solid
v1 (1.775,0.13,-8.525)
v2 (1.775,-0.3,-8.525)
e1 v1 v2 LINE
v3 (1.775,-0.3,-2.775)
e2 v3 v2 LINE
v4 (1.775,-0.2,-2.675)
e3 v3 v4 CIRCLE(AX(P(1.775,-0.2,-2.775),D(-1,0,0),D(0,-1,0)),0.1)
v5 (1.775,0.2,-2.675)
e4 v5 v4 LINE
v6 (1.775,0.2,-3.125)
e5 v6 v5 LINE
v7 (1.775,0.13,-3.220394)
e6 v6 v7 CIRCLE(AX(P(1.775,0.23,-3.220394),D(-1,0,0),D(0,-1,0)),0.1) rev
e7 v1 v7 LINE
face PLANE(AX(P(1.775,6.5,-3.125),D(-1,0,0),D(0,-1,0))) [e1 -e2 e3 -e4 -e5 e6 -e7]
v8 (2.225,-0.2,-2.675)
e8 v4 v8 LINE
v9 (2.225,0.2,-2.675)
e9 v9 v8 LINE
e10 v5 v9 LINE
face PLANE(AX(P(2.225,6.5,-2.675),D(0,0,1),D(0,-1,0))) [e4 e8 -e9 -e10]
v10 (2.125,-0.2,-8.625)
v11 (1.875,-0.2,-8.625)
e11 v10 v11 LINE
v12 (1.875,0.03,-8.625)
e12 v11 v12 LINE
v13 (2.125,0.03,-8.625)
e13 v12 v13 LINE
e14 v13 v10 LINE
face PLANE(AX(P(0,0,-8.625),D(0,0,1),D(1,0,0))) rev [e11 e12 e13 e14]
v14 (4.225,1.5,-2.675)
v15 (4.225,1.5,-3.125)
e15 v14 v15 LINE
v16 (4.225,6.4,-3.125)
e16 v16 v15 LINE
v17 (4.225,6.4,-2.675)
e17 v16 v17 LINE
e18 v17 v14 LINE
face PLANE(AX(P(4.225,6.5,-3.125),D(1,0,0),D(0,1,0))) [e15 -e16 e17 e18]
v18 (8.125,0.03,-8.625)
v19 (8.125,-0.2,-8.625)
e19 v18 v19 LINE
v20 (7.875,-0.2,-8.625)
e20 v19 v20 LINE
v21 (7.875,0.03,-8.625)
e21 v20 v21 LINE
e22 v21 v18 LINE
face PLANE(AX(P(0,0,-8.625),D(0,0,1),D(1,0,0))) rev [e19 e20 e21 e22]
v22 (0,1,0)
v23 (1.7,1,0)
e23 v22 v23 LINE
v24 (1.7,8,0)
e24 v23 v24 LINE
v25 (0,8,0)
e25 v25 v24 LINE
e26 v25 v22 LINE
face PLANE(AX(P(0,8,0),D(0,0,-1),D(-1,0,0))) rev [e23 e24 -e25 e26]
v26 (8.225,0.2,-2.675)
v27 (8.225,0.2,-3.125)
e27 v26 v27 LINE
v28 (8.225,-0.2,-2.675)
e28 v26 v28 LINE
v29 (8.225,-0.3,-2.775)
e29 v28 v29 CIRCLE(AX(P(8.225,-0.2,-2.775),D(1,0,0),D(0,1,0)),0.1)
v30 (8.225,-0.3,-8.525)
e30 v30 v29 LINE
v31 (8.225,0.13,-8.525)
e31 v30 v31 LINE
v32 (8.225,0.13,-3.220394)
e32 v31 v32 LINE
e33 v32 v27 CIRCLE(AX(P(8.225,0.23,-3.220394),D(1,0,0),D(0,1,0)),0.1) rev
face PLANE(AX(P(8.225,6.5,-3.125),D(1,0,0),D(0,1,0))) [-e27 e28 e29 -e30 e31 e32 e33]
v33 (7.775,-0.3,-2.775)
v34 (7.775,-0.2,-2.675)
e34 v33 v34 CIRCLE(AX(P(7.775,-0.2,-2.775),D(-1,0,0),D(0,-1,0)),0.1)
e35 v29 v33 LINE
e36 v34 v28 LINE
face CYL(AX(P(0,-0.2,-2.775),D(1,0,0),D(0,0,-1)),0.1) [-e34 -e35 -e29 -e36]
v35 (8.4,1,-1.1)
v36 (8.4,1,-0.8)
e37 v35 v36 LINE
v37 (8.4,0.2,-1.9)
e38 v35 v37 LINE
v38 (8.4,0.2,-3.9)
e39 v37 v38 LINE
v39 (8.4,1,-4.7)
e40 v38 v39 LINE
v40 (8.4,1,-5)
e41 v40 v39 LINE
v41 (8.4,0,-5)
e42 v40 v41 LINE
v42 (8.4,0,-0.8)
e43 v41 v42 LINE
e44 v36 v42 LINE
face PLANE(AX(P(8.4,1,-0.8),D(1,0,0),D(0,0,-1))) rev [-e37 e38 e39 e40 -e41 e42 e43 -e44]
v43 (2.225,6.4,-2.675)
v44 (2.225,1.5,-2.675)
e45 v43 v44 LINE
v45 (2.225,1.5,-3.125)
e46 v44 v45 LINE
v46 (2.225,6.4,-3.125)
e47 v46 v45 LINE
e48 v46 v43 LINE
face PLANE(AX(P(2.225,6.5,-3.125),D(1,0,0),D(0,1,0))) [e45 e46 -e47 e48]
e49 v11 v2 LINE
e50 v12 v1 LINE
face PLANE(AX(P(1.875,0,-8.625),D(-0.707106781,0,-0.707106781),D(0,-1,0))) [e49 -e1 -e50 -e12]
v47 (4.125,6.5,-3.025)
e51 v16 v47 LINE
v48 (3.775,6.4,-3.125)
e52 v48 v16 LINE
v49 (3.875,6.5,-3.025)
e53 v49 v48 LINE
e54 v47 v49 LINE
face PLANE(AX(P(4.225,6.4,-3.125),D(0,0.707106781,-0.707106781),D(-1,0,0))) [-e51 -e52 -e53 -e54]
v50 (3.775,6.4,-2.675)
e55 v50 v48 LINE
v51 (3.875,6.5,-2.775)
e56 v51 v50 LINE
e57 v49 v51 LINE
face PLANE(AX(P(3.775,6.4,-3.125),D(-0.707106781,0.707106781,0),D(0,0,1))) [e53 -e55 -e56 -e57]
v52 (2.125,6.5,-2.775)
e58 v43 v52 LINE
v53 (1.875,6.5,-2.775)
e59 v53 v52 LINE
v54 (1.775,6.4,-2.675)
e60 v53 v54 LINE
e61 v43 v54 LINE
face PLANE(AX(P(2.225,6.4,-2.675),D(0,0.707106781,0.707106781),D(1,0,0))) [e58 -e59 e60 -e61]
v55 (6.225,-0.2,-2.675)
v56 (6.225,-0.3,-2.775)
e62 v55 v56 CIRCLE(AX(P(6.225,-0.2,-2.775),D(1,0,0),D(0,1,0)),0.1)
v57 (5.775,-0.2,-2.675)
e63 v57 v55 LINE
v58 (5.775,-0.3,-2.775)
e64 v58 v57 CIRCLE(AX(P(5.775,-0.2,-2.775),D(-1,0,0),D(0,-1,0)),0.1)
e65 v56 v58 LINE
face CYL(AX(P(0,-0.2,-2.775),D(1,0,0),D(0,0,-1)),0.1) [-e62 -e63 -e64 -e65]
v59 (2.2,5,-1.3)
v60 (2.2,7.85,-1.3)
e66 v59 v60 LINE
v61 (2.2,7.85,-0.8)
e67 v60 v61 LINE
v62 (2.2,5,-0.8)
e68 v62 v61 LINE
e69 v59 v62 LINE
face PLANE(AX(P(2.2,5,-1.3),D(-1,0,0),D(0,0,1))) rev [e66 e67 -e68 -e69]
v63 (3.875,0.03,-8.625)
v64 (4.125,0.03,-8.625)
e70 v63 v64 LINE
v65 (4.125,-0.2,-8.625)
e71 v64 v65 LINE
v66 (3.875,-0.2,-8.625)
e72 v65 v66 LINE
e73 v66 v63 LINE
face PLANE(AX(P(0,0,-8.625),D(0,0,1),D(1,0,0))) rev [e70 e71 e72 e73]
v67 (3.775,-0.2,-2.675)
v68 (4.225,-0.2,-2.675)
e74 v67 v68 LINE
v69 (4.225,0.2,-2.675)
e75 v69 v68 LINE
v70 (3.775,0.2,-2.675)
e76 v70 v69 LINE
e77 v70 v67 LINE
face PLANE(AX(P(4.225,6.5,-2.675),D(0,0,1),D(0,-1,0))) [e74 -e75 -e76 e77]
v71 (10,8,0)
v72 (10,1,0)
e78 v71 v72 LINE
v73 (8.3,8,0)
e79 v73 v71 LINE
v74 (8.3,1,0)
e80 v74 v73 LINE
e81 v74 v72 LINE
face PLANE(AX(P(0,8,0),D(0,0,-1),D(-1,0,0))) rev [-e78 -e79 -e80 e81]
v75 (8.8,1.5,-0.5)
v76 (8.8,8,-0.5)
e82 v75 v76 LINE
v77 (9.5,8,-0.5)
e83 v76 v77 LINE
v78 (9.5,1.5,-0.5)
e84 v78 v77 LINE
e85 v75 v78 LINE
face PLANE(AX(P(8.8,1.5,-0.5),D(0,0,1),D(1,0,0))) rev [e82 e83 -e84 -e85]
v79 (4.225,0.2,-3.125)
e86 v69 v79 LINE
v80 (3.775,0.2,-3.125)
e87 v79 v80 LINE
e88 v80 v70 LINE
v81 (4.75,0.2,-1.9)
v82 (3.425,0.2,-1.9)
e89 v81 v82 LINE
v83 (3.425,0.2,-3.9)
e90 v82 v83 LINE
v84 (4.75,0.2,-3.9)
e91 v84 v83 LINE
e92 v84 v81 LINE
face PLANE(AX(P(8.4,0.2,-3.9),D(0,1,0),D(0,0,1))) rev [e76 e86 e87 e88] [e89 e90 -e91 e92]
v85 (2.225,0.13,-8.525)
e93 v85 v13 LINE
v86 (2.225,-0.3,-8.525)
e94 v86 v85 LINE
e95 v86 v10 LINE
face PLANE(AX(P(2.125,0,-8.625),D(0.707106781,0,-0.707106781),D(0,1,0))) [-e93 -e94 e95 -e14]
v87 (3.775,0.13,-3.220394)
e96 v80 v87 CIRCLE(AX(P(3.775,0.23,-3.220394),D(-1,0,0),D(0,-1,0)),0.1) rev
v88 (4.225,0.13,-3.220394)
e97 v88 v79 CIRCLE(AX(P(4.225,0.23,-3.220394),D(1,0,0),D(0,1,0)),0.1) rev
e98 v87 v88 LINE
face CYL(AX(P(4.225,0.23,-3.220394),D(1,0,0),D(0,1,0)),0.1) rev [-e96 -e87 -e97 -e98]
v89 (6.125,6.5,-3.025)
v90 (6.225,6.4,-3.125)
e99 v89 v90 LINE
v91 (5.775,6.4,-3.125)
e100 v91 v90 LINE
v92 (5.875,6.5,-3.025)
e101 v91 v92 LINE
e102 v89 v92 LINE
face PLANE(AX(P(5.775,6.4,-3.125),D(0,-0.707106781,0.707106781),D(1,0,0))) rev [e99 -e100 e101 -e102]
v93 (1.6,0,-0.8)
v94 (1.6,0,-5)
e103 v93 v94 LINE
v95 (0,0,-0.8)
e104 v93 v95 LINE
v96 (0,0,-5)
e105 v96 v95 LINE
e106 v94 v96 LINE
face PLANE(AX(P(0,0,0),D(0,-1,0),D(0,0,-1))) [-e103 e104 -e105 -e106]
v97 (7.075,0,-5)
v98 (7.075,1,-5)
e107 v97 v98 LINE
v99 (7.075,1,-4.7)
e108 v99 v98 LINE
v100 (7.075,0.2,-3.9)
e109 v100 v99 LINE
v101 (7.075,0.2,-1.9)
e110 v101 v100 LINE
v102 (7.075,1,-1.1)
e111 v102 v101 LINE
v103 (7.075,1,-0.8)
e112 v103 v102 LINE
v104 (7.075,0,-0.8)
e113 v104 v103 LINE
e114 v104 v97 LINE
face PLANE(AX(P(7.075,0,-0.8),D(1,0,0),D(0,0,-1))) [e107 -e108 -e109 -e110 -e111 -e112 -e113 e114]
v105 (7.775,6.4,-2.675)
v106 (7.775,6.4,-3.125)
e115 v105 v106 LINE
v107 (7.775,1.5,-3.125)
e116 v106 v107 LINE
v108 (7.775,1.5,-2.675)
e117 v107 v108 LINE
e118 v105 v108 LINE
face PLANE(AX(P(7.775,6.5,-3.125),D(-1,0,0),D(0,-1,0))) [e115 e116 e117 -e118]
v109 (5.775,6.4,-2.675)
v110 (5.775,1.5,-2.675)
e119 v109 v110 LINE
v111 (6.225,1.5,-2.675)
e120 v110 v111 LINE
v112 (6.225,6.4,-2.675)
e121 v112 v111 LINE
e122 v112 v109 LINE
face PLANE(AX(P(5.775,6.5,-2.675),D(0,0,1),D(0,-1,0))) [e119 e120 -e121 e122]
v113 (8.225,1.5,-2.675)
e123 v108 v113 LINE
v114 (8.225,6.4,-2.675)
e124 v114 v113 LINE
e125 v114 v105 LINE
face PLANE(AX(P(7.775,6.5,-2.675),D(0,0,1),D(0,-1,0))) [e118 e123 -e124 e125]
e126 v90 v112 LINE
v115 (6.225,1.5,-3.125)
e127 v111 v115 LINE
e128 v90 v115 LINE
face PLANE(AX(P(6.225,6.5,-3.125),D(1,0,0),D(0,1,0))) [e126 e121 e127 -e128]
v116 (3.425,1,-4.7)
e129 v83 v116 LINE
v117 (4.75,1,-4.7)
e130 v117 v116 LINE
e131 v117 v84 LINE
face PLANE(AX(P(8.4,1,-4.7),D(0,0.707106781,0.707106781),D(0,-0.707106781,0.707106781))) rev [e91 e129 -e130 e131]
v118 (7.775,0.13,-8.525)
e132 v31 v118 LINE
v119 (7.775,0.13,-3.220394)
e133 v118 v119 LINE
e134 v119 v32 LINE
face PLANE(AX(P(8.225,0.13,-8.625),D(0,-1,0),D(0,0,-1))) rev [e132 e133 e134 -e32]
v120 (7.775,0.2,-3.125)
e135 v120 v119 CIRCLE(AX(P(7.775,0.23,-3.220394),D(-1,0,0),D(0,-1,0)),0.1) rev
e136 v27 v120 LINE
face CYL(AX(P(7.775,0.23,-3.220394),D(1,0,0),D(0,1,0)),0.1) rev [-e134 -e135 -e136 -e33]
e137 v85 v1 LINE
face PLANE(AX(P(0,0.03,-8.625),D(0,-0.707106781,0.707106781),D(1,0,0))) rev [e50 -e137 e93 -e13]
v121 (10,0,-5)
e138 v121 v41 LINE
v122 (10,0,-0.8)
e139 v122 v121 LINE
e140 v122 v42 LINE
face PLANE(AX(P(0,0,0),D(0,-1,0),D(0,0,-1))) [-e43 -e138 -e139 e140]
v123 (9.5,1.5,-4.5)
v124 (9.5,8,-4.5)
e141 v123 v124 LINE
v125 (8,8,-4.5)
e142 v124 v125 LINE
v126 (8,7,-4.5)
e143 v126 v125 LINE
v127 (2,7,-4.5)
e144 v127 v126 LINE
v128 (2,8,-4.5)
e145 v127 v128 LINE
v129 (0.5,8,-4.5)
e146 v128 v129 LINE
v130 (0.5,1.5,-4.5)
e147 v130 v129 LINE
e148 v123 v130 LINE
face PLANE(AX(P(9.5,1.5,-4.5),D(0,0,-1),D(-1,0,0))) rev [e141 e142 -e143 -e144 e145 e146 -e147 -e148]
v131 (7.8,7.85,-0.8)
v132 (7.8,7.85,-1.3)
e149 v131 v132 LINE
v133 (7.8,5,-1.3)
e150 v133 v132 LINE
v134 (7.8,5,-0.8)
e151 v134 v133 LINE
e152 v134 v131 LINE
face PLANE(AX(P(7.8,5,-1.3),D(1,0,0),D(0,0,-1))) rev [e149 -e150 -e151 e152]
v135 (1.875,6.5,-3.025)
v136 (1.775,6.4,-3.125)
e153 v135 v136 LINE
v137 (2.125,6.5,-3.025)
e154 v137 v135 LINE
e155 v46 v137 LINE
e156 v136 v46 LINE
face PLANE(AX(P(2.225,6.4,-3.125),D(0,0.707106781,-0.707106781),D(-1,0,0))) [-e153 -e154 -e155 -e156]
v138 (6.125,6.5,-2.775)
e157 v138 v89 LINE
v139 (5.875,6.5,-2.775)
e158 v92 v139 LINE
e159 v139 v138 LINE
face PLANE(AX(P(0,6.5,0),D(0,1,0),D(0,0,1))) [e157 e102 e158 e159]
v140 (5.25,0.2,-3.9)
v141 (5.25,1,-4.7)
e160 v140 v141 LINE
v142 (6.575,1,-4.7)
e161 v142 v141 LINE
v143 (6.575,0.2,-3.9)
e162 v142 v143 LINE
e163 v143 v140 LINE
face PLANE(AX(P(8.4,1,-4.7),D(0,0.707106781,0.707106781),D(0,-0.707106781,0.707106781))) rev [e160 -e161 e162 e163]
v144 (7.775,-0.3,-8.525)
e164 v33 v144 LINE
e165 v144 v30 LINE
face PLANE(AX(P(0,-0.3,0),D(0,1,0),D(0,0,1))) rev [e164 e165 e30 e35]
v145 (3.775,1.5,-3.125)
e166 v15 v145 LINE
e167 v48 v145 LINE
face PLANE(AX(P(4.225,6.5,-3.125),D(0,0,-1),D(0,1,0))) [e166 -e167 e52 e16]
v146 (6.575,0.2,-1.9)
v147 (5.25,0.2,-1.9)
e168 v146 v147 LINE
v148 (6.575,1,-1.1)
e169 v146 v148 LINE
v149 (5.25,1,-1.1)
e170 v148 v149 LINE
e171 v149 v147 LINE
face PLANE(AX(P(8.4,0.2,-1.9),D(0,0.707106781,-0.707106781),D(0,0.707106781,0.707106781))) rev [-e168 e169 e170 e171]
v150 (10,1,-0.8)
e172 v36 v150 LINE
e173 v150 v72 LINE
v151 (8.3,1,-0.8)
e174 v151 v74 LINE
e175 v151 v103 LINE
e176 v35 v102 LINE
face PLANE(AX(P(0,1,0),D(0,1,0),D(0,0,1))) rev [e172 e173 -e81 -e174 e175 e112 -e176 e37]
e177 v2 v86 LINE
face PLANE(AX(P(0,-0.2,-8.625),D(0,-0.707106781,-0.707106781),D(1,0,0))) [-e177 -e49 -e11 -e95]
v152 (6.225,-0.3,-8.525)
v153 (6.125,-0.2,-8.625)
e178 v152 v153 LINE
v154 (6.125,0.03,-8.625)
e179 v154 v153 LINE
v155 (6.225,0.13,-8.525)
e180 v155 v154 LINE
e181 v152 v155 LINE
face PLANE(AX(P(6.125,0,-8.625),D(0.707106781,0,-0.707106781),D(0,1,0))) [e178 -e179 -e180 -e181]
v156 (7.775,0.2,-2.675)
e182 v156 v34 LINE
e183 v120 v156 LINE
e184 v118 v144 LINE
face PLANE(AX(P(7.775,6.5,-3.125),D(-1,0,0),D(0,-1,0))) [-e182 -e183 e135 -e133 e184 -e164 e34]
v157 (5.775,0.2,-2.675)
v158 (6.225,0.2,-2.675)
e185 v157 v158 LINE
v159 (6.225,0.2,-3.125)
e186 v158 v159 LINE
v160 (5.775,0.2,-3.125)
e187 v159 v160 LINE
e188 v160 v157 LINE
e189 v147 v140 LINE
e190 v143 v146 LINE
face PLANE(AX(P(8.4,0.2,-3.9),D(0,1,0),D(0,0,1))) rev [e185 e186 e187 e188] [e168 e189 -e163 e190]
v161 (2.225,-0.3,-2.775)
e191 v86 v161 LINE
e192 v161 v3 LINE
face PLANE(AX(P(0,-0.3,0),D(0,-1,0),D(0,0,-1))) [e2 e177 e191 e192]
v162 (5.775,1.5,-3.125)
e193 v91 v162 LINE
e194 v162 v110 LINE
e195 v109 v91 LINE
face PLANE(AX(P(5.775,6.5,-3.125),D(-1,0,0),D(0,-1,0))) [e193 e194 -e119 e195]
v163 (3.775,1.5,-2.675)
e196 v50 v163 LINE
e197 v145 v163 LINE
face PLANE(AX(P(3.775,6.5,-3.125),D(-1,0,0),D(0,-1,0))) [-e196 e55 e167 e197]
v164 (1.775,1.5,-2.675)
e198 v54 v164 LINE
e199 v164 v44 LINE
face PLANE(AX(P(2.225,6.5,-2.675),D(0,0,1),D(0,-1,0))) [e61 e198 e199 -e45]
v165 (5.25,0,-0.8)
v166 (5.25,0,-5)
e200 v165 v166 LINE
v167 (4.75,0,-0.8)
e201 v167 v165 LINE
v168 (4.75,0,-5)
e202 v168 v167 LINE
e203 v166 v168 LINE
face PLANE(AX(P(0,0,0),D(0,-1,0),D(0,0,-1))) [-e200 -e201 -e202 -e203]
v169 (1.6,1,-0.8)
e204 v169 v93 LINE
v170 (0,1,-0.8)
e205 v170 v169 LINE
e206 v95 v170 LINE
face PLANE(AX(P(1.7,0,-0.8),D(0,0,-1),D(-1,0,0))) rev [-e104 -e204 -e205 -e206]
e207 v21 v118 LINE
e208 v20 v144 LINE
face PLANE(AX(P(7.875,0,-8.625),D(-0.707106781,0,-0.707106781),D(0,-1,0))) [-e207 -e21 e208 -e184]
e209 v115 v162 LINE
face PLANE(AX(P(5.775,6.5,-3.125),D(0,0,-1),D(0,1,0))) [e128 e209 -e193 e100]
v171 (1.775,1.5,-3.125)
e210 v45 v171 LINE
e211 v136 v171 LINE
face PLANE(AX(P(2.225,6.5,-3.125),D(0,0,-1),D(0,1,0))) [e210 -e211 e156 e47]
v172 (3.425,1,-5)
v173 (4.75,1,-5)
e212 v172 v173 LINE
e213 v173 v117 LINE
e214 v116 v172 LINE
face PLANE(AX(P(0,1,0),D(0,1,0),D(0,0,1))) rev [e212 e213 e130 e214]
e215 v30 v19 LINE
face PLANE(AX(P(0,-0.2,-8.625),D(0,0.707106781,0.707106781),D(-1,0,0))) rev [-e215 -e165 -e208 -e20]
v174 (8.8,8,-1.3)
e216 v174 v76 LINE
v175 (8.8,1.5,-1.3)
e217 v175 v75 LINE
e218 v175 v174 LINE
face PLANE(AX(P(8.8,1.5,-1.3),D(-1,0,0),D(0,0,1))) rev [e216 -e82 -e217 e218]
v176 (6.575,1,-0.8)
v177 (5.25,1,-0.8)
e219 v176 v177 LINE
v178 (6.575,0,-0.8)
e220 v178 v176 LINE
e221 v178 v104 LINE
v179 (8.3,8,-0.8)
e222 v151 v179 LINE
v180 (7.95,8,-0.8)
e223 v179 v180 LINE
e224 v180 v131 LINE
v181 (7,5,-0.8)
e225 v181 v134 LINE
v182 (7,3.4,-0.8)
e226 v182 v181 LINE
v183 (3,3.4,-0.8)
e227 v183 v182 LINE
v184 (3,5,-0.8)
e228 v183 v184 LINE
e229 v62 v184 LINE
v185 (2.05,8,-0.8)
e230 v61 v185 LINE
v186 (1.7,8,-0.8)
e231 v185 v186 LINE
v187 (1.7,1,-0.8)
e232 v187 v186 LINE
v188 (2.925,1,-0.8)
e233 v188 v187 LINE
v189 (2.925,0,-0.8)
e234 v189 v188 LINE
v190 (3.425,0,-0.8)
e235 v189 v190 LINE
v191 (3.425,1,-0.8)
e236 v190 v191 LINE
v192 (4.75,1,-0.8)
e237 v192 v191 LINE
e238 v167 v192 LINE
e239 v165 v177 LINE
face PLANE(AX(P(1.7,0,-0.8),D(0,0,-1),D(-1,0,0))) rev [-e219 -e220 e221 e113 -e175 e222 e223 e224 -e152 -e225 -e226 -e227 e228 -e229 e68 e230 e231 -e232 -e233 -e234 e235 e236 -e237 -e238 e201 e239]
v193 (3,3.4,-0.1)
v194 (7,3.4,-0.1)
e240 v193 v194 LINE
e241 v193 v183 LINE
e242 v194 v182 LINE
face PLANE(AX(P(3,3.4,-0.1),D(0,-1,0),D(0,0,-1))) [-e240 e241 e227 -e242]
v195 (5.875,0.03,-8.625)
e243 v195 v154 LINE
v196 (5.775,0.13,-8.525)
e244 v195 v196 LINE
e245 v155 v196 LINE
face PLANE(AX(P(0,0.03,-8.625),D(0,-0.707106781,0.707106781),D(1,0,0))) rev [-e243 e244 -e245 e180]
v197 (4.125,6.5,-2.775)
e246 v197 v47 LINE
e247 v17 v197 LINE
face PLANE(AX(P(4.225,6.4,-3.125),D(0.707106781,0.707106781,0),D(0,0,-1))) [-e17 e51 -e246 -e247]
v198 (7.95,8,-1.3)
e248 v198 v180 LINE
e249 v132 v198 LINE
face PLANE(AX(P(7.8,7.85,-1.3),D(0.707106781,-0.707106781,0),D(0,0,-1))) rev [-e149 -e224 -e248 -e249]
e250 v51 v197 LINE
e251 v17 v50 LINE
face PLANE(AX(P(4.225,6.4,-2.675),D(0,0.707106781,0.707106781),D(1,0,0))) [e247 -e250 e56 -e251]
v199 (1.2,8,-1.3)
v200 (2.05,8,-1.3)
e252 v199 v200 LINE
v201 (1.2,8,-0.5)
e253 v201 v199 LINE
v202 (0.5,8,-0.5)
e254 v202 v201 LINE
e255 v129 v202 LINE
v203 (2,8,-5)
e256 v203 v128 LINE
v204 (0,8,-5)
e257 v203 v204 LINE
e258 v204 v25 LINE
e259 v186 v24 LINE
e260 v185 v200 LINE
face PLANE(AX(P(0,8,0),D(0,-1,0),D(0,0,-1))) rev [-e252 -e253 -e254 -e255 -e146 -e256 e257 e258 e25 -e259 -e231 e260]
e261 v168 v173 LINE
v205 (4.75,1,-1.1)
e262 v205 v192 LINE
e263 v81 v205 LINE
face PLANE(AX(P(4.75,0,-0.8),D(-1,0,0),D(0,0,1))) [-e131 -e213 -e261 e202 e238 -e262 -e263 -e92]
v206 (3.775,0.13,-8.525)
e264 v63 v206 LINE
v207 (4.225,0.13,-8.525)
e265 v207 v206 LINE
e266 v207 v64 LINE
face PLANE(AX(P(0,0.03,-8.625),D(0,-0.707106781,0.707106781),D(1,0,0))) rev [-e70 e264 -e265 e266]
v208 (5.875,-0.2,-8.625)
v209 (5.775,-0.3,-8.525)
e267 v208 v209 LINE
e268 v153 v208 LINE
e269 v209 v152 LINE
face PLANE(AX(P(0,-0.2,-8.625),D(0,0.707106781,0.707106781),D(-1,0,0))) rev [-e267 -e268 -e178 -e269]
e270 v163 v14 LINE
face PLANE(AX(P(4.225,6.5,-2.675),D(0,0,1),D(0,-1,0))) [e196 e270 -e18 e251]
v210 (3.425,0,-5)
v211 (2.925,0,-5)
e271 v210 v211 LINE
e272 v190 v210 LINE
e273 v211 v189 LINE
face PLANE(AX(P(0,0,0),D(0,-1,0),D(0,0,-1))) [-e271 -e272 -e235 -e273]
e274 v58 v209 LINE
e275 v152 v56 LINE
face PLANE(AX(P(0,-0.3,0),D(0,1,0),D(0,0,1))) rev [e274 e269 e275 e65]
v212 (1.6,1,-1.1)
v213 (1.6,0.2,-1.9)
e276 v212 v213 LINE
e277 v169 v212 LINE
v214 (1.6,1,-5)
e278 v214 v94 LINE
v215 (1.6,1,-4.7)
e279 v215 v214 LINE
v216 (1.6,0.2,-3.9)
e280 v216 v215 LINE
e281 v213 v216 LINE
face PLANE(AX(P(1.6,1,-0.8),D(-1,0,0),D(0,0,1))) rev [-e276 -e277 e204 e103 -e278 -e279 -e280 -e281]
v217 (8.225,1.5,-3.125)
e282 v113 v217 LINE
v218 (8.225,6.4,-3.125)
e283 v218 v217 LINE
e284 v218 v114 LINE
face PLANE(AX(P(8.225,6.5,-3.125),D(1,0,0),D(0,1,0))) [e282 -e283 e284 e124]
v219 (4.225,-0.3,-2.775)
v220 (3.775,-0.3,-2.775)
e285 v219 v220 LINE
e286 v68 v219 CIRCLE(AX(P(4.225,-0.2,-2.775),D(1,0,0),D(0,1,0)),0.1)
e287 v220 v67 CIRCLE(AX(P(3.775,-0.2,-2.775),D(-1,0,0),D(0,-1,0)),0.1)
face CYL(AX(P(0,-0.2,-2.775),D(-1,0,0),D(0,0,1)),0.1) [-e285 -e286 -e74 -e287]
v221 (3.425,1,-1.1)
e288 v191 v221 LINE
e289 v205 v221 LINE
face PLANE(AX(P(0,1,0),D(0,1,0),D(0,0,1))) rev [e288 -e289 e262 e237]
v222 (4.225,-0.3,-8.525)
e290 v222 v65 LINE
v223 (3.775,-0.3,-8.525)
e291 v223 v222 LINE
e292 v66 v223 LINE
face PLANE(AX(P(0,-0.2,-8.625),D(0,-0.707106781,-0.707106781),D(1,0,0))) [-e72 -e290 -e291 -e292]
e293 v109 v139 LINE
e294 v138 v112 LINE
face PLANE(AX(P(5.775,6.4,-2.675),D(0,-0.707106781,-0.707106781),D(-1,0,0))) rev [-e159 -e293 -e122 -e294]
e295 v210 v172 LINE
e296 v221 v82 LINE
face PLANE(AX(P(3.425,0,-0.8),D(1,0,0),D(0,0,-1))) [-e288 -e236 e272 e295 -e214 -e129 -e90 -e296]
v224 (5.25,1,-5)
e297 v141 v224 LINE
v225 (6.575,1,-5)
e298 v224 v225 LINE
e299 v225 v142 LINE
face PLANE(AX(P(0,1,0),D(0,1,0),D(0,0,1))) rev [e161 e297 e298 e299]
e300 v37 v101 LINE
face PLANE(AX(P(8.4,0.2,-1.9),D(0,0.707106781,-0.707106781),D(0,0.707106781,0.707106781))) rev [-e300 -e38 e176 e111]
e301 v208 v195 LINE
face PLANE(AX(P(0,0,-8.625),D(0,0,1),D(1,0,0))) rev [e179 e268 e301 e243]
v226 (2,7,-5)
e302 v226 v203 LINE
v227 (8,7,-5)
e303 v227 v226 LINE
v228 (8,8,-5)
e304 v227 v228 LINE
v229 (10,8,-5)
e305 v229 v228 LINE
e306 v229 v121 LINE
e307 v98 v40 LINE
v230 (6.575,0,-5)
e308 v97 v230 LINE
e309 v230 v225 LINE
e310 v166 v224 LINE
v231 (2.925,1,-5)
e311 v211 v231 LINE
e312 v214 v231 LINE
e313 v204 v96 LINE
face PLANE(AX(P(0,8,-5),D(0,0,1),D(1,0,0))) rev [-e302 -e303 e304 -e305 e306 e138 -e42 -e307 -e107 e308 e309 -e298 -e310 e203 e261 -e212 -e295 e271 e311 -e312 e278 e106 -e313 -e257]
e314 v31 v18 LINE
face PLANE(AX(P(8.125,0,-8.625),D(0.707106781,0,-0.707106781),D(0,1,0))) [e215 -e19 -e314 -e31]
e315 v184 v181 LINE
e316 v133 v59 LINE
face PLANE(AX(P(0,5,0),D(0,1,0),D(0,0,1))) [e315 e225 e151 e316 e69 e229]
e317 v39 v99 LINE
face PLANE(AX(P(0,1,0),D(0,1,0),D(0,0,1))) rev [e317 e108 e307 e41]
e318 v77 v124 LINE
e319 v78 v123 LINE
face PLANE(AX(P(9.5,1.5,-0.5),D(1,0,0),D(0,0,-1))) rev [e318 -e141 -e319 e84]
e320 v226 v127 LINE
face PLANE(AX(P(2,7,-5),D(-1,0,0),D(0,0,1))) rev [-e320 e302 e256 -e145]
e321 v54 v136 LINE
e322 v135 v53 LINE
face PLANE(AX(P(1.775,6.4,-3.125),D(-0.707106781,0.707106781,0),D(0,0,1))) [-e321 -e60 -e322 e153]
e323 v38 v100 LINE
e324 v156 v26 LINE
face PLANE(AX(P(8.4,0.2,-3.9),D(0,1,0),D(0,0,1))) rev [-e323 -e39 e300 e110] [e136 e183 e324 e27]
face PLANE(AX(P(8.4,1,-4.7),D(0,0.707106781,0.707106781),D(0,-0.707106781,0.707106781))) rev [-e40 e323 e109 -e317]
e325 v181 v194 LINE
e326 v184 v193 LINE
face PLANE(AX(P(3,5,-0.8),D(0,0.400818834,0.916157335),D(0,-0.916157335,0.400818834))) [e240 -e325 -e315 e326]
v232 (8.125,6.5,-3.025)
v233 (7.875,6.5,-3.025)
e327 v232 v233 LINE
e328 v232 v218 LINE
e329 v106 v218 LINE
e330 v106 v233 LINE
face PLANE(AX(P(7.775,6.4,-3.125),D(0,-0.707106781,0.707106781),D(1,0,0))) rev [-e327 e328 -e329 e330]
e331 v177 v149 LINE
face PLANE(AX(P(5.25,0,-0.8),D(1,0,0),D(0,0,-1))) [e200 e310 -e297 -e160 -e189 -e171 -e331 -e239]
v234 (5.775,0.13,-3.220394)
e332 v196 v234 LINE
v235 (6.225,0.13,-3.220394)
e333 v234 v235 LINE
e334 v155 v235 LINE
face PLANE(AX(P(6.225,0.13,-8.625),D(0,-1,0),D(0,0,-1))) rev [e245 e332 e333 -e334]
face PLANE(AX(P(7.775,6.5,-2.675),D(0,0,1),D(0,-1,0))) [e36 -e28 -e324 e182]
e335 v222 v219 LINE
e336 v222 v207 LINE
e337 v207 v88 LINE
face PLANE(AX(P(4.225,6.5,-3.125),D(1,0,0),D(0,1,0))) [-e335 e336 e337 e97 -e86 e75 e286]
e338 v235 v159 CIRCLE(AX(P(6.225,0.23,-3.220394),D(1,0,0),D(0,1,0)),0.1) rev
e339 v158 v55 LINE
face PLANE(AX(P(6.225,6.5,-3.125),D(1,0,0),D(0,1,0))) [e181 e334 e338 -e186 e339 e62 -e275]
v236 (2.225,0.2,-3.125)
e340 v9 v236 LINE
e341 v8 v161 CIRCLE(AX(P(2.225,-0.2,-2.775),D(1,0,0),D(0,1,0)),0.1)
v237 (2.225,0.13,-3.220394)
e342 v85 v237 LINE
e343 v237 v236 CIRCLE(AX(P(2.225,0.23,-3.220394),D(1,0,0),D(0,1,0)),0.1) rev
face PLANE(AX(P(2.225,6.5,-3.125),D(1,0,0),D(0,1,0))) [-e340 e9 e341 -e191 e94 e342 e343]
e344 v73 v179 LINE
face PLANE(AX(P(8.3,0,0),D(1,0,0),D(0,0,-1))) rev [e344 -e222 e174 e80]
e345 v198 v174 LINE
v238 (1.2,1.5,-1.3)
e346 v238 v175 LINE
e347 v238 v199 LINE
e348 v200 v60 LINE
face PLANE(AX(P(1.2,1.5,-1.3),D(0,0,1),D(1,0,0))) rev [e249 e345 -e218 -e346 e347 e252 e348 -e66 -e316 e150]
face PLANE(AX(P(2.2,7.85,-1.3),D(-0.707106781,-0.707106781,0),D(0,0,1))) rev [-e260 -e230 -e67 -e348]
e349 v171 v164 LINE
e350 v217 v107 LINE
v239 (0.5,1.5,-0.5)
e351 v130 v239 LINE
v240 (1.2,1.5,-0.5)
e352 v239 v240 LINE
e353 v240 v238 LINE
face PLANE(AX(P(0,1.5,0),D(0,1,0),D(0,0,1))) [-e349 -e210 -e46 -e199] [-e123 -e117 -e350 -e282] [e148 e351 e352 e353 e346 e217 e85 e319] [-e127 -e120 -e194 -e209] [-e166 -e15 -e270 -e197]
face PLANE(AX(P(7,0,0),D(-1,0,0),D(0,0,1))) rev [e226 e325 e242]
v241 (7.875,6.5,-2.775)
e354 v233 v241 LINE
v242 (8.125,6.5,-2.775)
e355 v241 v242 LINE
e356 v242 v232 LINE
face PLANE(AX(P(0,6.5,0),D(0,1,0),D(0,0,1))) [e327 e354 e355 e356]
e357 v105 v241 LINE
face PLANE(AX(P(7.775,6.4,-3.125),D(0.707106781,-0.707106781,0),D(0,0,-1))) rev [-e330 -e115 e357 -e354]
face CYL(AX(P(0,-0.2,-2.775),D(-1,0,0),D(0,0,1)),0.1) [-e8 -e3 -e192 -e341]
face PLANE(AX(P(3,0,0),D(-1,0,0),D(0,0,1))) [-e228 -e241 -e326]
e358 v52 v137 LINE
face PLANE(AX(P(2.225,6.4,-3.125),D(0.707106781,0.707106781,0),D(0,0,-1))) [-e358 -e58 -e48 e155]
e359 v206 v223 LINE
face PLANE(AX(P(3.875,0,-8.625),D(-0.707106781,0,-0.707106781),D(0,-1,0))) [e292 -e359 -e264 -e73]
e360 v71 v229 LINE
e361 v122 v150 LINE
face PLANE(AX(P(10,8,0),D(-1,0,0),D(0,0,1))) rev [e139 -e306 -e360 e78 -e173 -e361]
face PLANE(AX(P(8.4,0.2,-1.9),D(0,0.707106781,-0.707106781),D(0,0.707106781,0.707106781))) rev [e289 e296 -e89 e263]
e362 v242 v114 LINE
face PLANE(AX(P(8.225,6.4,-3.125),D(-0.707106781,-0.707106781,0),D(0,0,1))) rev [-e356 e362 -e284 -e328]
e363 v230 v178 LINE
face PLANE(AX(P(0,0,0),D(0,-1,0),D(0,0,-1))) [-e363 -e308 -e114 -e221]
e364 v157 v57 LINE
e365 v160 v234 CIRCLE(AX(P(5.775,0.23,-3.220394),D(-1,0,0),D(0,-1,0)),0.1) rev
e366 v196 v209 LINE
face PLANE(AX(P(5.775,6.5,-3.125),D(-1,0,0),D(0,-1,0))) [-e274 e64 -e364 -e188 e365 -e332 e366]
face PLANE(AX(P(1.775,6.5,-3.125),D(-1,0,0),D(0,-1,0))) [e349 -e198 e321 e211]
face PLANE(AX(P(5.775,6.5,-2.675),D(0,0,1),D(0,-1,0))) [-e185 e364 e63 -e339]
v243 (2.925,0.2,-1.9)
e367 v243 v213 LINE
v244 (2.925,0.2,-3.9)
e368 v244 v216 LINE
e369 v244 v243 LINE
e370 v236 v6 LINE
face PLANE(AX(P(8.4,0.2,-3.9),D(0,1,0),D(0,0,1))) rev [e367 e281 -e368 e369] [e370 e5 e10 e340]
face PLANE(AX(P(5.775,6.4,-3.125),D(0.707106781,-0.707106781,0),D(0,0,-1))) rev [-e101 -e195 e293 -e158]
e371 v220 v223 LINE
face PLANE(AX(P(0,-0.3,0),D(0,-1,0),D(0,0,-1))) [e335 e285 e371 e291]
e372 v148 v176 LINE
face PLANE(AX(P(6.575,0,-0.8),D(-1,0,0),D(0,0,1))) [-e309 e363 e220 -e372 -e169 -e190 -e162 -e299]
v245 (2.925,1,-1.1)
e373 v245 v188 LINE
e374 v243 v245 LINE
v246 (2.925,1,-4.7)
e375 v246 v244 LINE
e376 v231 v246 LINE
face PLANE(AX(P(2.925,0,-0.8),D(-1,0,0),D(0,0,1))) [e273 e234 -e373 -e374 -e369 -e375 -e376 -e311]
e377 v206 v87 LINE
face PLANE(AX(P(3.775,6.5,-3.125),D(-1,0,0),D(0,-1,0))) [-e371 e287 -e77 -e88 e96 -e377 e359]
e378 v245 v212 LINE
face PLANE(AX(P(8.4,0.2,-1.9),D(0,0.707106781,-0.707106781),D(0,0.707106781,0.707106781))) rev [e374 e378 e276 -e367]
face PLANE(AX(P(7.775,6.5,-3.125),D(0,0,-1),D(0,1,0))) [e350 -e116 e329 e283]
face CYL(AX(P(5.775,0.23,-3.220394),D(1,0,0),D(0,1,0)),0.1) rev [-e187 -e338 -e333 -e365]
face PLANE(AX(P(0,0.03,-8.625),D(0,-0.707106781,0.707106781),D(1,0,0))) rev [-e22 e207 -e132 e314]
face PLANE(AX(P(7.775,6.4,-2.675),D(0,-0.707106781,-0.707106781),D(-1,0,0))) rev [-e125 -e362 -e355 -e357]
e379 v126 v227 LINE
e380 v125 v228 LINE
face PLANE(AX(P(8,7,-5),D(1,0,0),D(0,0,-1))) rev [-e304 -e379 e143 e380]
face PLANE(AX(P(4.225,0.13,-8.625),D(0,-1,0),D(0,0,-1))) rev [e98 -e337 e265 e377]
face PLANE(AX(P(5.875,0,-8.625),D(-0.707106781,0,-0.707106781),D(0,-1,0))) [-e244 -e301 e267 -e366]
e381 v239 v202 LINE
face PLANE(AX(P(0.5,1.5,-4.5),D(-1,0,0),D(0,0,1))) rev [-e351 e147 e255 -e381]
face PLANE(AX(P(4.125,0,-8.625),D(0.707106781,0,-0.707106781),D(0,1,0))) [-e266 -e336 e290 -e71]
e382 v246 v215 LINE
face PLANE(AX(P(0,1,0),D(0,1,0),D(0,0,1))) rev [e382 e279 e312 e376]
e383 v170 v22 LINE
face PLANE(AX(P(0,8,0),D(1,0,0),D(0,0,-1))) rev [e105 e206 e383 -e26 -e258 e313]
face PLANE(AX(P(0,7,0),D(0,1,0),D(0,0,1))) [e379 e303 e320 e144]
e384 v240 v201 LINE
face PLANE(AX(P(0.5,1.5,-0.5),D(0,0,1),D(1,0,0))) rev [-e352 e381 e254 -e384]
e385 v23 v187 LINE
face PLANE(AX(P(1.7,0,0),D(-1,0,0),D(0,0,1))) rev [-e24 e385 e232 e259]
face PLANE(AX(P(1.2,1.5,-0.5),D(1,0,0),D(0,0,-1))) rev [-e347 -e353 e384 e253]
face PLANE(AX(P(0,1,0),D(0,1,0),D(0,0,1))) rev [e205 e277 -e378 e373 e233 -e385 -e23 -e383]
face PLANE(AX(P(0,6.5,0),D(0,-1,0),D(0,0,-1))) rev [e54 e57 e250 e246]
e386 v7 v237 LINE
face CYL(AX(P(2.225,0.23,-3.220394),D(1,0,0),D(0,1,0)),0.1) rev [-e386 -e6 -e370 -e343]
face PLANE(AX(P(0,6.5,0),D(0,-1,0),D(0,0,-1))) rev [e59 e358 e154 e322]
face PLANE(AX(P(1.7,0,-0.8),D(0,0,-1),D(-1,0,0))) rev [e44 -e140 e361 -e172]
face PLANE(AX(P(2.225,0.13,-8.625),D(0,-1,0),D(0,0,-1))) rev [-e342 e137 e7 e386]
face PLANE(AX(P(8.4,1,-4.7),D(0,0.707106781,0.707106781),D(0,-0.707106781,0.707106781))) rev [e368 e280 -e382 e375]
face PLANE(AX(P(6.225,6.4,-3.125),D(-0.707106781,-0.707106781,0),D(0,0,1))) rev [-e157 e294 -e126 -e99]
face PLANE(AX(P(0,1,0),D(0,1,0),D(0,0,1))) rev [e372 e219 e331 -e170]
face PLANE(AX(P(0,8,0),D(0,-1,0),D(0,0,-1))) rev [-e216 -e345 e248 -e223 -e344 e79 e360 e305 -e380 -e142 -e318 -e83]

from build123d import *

# Parameters (mm, degrees)
ESQUISSE1_W             = 10
ESQUISSE1_H             = 5
BOSS_EXTRU_1_DEPTH      = 8
ESQUISSE2_W             = 6.6
ESQUISSE2_H             = 0.8
ENL_V_MAT_EXTRU_1_DEPTH = 8
ENL_V_MAT_EXTRU_2_DEPTH = 6.5
ESQUISSE5_W             = 6
ESQUISSE5_H             = 0.5
ENL_V_MAT_EXTRU_3_DEPTH = 1
ESQUISSE6_W             = 5.6
ESQUISSE6_H             = 0.5
ENL_V_MAT_EXTRU_4_DEPTH = 3
ESQUISSE7_W             = 0.8
ESQUISSE7_H             = 1
ENL_V_MAT_EXTRU_5_DEPTH = 10
ESQUISSE8_W             = 6.8
ESQUISSE8_H             = 4.2
ENL_V_MAT_EXTRU_6_DEPTH = 1
BOSS_EXTRU_2_DEPTH      = 6.8
BOSS_EXTRU_3_DEPTH      = 2
BOSS_EXTRU_3_DEPTH_BACK = 2
ESQUISSE12_W            = 0.5
ESQUISSE12_H            = 4.2
BOSS_EXTRU_4_DEPTH      = 1
CHANFREIN1_SIZE         = 0.15
BOSS_EXTRU_5_DEPTH      = 0.5
BOSS_EXTRU_5_DEPTH_BACK = 6.3
ESQUISSE13_W            = 0.45
ESQUISSE13_H            = 0.45
ESQUISSE14_W            = 0.45
ESQUISSE14_H            = 0.43
BOSS_EXTRU_6_DEPTH      = 5.5
CONG_1_R                = 0.1
CHANFREIN2_SIZE         = 0.1


with BuildPart() as part:
    # Esquisse1 → Boss.-Extru.1 (new body)
    with BuildSketch(Plane(origin=(0, 0, 0), x_dir=(1, 0, 0), z_dir=(0, 1, 0))):
        with Locations((5, 2.5)):
            Rectangle(ESQUISSE1_W, ESQUISSE1_H)
    extrude(amount=BOSS_EXTRU_1_DEPTH)

    # Esquisse2 → Enlèv. mat.-Extru.1 (cut)
    with BuildSketch(Plane(origin=(0, 8, 0), x_dir=(1, 0, 0), z_dir=(0, 1, 0))):
        with Locations((5, 0.4)):
            Rectangle(ESQUISSE2_W, ESQUISSE2_H)
    extrude(amount=-ENL_V_MAT_EXTRU_1_DEPTH, mode=Mode.SUBTRACT)

    # Esquisse4 → Enlèv. mat.-Extru.2 (cut)
    with BuildSketch(Plane(origin=(0, 8, 0), x_dir=(1, 0, 0), z_dir=(0, 1, 0))):
        Polygon((0.5, 0.5), (1.2, 0.5), (1.2, 1.3), (8.8, 1.3), (8.8, 0.5), (9.5, 0.5), (9.5, 4.5), (0.5, 4.5), align=None)
    extrude(amount=-ENL_V_MAT_EXTRU_2_DEPTH, mode=Mode.SUBTRACT)

    # Esquisse5 → Enlèv. mat.-Extru.3 (cut)
    with BuildSketch(Plane(origin=(0, 8, 0), x_dir=(1, 0, 0), z_dir=(0, 1, 0))):
        with Locations((5, 4.75)):
            Rectangle(ESQUISSE5_W, ESQUISSE5_H)
    extrude(amount=-ENL_V_MAT_EXTRU_3_DEPTH, mode=Mode.SUBTRACT)

    # Esquisse6 → Enlèv. mat.-Extru.4 (cut)
    with BuildSketch(Plane(origin=(0, 8, 0), x_dir=(1, 0, 0), z_dir=(0, 1, 0))):
        with Locations((5, 1.05)):
            Rectangle(ESQUISSE6_W, ESQUISSE6_H)
    extrude(amount=-ENL_V_MAT_EXTRU_4_DEPTH, mode=Mode.SUBTRACT)

    # Esquisse7 → Enlèv. mat.-Extru.5 (cut)
    with BuildSketch(Plane(origin=(10, 0, 0), x_dir=(0, 0, -1), z_dir=(1, 0, 0))):
        with Locations((0.4, 0.5)):
            Rectangle(ESQUISSE7_W, ESQUISSE7_H)
    extrude(amount=-ENL_V_MAT_EXTRU_5_DEPTH, mode=Mode.SUBTRACT)

    # Esquisse8 → Enlèv. mat.-Extru.6 (cut)
    with BuildSketch(Plane.XZ):
        with Locations((5, -2.9)):
            Rectangle(ESQUISSE8_W, ESQUISSE8_H)
    extrude(amount=-ENL_V_MAT_EXTRU_6_DEPTH, mode=Mode.SUBTRACT)

    # Esquisse9 → Boss.-Extru.2 (add)
    with BuildSketch(Plane(origin=(1.6, 0, 0), x_dir=(0, 0, -1), z_dir=(1, 0, 0))):
        Polygon((4.7, 1), (3.9, 0.2), (1.9, 0.2), (1.1, 1), align=None)
    extrude(amount=BOSS_EXTRU_2_DEPTH)

    # Esquisse11 → Boss.-Extru.3 (add, two sides: drawn at the far end of the back side and taken through both)
    with BuildSketch(Plane(origin=(5, 0, 0), x_dir=(0, 0, -1), z_dir=(1, 0, 0)).offset(-BOSS_EXTRU_3_DEPTH_BACK)):
        Polygon((0.8, 5), (0.1, 3.4), (0.8, 3.4), align=None)
    extrude(amount=BOSS_EXTRU_3_DEPTH + BOSS_EXTRU_3_DEPTH_BACK)

    # Esquisse12 → Boss.-Extru.4 (add)
    with BuildSketch(Plane(origin=(0, 1, 0), x_dir=(1, 0, 0), z_dir=(0, 1, 0))):
        with Locations((5, 2.9)):
            Rectangle(ESQUISSE12_W, ESQUISSE12_H)
        with Locations((3.175, 2.9)):
            Rectangle(ESQUISSE12_W, ESQUISSE12_H)
        with Locations((6.825, 2.9)):
            Rectangle(ESQUISSE12_W, ESQUISSE12_H)
    extrude(amount=-BOSS_EXTRU_4_DEPTH)

    # Chanfrein1
    chanfrein1_edges = [part.edges().sort_by_distance(p)[0] for p in [
        (2.2, 8, -1.05),
        (7.8, 8, -1.05),
    ]]
    chamfer(chanfrein1_edges, length=CHANFREIN1_SIZE)

    # Esquisse13 → Boss.-Extru.5 (add, two sides: drawn at the far end of the back side and taken through both)
    with BuildSketch(Plane.XZ.offset(-0.2).offset(-BOSS_EXTRU_5_DEPTH_BACK)):
        with Locations((4, -2.9)):
            Rectangle(ESQUISSE13_W, ESQUISSE13_H)
        with Locations((2, -2.9)):
            Rectangle(ESQUISSE13_W, ESQUISSE13_H)
        with Locations((8, -2.9)):
            Rectangle(ESQUISSE13_W, ESQUISSE13_H)
        with Locations((6, -2.9)):
            Rectangle(ESQUISSE13_W, ESQUISSE13_H)
    extrude(amount=BOSS_EXTRU_5_DEPTH + BOSS_EXTRU_5_DEPTH_BACK)

    # Esquisse14 → Boss.-Extru.6 (add)
    with BuildSketch(Plane(origin=(0, 0, -3.125), x_dir=(-1, 0, 0), z_dir=(0, 0, -1))):
        with Locations((-8, -0.085)):
            Rectangle(ESQUISSE14_W, ESQUISSE14_H)
        with Locations((-6, -0.085)):
            Rectangle(ESQUISSE14_W, ESQUISSE14_H)
        with Locations((-4, -0.085)):
            Rectangle(ESQUISSE14_W, ESQUISSE14_H)
        with Locations((-2, -0.085)):
            Rectangle(ESQUISSE14_W, ESQUISSE14_H)
    extrude(amount=BOSS_EXTRU_6_DEPTH)

    # Congé1
    # the kernel refuses this fillet: 0.1 mm, written as the material it adds along each edge
    with BuildSketch(Plane(origin=(7.775, 0.13, -3.125), x_dir=(0, 1, 0), z_dir=(1, 0, 0)), Plane(origin=(5.775, 0.13, -3.125), x_dir=(0, 1, 0), z_dir=(1, 0, 0))) as cong_1_piece_1:
        with BuildLine():
            CenterArc((0.1, -0.09539392), CONG_1_R, 107.457603124, 72.542396876)
            Line((0, -0.09539392), (0, 0))
            Line((0, 0), (0.07, 0))
        make_face()
    extrude(amount=0.45)
    with BuildSketch(Plane(origin=(3.775, 0.13, -3.125), x_dir=(0, 0, -1), z_dir=(1, 0, 0)), Plane(origin=(1.775, 0.13, -3.125), x_dir=(0, 0, -1), z_dir=(1, 0, 0))) as cong_1_piece_2:
        with BuildLine():
            CenterArc((0.09539392, 0.1), CONG_1_R, 197.457603124, 72.542396876)
            Line((0, 0.07), (0, 0))
            Line((0, 0), (0.09539392, 0))
        make_face()
    extrude(amount=0.45)
    # the kernel refuses this fillet: 0.1 mm, written as the material it takes off along each edge
    with BuildSketch(Plane(origin=(3.525, -0.3, -2.675), x_dir=(0, 1, 0), z_dir=(1, 0, 0)), Plane(origin=(1.525, -0.3, -2.675), x_dir=(0, 1, 0), z_dir=(1, 0, 0))) as cong_1_2_piece_1:
        with BuildLine():
            CenterArc((CONG_1_R, -CONG_1_R), CONG_1_R, 90, 90)
            Line((0, -CONG_1_R), (0, 0))
            Line((0, 0), (CONG_1_R, 0))
        make_face()
    extrude(amount=0.95, mode=Mode.SUBTRACT)
    with BuildSketch(Plane(origin=(8.475, -0.3, -2.675), x_dir=(0, 1, 0), z_dir=(-1, 0, 0)), Plane(origin=(6.475, -0.3, -2.675), x_dir=(0, 1, 0), z_dir=(-1, 0, 0))) as cong_1_2_piece_2:
        with BuildLine():
            CenterArc((CONG_1_R, CONG_1_R), CONG_1_R, 180, 90)
            Line((0, CONG_1_R), (0, 0))
            Line((0, 0), (CONG_1_R, 0))
        make_face()
    extrude(amount=0.95, mode=Mode.SUBTRACT)

    # Chanfrein2
    chanfrein2_edges = [part.edges().sort_by_distance(p)[0] for p in [
        (4.225, 6.5, -2.9),
        (4, 6.5, -3.125),
        (3.775, 6.5, -2.9),
        (4, 6.5, -2.675),
        (2.225, 6.5, -2.9),
        (2, 6.5, -3.125),
        (1.775, 6.5, -2.9),
        (2, 6.5, -2.675),
        (7.775, 6.5, -2.9),
        (8, 6.5, -2.675),
        (8.225, 6.5, -2.9),
        (8, 6.5, -3.125),
        (5.775, 6.5, -2.9),
        (6, 6.5, -2.675),
        (6.225, 6.5, -2.9),
        (6, 6.5, -3.125),
        (8.225, -0.085, -8.625),
        (8, -0.3, -8.625),
        (7.775, -0.085, -8.625),
        (8, 0.13, -8.625),
        (6.225, -0.085, -8.625),
        (6, -0.3, -8.625),
        (5.775, -0.085, -8.625),
        (6, 0.13, -8.625),
        (4.225, -0.085, -8.625),
        (4, -0.3, -8.625),
        (3.775, -0.085, -8.625),
        (4, 0.13, -8.625),
        (2.225, -0.085, -8.625),
        (2, -0.3, -8.625),
        (1.775, -0.085, -8.625),
        (2, 0.13, -8.625),
    ]]
    chamfer(chanfrein2_edges, length=CHANFREIN2_SIZE)


solid = part.part
